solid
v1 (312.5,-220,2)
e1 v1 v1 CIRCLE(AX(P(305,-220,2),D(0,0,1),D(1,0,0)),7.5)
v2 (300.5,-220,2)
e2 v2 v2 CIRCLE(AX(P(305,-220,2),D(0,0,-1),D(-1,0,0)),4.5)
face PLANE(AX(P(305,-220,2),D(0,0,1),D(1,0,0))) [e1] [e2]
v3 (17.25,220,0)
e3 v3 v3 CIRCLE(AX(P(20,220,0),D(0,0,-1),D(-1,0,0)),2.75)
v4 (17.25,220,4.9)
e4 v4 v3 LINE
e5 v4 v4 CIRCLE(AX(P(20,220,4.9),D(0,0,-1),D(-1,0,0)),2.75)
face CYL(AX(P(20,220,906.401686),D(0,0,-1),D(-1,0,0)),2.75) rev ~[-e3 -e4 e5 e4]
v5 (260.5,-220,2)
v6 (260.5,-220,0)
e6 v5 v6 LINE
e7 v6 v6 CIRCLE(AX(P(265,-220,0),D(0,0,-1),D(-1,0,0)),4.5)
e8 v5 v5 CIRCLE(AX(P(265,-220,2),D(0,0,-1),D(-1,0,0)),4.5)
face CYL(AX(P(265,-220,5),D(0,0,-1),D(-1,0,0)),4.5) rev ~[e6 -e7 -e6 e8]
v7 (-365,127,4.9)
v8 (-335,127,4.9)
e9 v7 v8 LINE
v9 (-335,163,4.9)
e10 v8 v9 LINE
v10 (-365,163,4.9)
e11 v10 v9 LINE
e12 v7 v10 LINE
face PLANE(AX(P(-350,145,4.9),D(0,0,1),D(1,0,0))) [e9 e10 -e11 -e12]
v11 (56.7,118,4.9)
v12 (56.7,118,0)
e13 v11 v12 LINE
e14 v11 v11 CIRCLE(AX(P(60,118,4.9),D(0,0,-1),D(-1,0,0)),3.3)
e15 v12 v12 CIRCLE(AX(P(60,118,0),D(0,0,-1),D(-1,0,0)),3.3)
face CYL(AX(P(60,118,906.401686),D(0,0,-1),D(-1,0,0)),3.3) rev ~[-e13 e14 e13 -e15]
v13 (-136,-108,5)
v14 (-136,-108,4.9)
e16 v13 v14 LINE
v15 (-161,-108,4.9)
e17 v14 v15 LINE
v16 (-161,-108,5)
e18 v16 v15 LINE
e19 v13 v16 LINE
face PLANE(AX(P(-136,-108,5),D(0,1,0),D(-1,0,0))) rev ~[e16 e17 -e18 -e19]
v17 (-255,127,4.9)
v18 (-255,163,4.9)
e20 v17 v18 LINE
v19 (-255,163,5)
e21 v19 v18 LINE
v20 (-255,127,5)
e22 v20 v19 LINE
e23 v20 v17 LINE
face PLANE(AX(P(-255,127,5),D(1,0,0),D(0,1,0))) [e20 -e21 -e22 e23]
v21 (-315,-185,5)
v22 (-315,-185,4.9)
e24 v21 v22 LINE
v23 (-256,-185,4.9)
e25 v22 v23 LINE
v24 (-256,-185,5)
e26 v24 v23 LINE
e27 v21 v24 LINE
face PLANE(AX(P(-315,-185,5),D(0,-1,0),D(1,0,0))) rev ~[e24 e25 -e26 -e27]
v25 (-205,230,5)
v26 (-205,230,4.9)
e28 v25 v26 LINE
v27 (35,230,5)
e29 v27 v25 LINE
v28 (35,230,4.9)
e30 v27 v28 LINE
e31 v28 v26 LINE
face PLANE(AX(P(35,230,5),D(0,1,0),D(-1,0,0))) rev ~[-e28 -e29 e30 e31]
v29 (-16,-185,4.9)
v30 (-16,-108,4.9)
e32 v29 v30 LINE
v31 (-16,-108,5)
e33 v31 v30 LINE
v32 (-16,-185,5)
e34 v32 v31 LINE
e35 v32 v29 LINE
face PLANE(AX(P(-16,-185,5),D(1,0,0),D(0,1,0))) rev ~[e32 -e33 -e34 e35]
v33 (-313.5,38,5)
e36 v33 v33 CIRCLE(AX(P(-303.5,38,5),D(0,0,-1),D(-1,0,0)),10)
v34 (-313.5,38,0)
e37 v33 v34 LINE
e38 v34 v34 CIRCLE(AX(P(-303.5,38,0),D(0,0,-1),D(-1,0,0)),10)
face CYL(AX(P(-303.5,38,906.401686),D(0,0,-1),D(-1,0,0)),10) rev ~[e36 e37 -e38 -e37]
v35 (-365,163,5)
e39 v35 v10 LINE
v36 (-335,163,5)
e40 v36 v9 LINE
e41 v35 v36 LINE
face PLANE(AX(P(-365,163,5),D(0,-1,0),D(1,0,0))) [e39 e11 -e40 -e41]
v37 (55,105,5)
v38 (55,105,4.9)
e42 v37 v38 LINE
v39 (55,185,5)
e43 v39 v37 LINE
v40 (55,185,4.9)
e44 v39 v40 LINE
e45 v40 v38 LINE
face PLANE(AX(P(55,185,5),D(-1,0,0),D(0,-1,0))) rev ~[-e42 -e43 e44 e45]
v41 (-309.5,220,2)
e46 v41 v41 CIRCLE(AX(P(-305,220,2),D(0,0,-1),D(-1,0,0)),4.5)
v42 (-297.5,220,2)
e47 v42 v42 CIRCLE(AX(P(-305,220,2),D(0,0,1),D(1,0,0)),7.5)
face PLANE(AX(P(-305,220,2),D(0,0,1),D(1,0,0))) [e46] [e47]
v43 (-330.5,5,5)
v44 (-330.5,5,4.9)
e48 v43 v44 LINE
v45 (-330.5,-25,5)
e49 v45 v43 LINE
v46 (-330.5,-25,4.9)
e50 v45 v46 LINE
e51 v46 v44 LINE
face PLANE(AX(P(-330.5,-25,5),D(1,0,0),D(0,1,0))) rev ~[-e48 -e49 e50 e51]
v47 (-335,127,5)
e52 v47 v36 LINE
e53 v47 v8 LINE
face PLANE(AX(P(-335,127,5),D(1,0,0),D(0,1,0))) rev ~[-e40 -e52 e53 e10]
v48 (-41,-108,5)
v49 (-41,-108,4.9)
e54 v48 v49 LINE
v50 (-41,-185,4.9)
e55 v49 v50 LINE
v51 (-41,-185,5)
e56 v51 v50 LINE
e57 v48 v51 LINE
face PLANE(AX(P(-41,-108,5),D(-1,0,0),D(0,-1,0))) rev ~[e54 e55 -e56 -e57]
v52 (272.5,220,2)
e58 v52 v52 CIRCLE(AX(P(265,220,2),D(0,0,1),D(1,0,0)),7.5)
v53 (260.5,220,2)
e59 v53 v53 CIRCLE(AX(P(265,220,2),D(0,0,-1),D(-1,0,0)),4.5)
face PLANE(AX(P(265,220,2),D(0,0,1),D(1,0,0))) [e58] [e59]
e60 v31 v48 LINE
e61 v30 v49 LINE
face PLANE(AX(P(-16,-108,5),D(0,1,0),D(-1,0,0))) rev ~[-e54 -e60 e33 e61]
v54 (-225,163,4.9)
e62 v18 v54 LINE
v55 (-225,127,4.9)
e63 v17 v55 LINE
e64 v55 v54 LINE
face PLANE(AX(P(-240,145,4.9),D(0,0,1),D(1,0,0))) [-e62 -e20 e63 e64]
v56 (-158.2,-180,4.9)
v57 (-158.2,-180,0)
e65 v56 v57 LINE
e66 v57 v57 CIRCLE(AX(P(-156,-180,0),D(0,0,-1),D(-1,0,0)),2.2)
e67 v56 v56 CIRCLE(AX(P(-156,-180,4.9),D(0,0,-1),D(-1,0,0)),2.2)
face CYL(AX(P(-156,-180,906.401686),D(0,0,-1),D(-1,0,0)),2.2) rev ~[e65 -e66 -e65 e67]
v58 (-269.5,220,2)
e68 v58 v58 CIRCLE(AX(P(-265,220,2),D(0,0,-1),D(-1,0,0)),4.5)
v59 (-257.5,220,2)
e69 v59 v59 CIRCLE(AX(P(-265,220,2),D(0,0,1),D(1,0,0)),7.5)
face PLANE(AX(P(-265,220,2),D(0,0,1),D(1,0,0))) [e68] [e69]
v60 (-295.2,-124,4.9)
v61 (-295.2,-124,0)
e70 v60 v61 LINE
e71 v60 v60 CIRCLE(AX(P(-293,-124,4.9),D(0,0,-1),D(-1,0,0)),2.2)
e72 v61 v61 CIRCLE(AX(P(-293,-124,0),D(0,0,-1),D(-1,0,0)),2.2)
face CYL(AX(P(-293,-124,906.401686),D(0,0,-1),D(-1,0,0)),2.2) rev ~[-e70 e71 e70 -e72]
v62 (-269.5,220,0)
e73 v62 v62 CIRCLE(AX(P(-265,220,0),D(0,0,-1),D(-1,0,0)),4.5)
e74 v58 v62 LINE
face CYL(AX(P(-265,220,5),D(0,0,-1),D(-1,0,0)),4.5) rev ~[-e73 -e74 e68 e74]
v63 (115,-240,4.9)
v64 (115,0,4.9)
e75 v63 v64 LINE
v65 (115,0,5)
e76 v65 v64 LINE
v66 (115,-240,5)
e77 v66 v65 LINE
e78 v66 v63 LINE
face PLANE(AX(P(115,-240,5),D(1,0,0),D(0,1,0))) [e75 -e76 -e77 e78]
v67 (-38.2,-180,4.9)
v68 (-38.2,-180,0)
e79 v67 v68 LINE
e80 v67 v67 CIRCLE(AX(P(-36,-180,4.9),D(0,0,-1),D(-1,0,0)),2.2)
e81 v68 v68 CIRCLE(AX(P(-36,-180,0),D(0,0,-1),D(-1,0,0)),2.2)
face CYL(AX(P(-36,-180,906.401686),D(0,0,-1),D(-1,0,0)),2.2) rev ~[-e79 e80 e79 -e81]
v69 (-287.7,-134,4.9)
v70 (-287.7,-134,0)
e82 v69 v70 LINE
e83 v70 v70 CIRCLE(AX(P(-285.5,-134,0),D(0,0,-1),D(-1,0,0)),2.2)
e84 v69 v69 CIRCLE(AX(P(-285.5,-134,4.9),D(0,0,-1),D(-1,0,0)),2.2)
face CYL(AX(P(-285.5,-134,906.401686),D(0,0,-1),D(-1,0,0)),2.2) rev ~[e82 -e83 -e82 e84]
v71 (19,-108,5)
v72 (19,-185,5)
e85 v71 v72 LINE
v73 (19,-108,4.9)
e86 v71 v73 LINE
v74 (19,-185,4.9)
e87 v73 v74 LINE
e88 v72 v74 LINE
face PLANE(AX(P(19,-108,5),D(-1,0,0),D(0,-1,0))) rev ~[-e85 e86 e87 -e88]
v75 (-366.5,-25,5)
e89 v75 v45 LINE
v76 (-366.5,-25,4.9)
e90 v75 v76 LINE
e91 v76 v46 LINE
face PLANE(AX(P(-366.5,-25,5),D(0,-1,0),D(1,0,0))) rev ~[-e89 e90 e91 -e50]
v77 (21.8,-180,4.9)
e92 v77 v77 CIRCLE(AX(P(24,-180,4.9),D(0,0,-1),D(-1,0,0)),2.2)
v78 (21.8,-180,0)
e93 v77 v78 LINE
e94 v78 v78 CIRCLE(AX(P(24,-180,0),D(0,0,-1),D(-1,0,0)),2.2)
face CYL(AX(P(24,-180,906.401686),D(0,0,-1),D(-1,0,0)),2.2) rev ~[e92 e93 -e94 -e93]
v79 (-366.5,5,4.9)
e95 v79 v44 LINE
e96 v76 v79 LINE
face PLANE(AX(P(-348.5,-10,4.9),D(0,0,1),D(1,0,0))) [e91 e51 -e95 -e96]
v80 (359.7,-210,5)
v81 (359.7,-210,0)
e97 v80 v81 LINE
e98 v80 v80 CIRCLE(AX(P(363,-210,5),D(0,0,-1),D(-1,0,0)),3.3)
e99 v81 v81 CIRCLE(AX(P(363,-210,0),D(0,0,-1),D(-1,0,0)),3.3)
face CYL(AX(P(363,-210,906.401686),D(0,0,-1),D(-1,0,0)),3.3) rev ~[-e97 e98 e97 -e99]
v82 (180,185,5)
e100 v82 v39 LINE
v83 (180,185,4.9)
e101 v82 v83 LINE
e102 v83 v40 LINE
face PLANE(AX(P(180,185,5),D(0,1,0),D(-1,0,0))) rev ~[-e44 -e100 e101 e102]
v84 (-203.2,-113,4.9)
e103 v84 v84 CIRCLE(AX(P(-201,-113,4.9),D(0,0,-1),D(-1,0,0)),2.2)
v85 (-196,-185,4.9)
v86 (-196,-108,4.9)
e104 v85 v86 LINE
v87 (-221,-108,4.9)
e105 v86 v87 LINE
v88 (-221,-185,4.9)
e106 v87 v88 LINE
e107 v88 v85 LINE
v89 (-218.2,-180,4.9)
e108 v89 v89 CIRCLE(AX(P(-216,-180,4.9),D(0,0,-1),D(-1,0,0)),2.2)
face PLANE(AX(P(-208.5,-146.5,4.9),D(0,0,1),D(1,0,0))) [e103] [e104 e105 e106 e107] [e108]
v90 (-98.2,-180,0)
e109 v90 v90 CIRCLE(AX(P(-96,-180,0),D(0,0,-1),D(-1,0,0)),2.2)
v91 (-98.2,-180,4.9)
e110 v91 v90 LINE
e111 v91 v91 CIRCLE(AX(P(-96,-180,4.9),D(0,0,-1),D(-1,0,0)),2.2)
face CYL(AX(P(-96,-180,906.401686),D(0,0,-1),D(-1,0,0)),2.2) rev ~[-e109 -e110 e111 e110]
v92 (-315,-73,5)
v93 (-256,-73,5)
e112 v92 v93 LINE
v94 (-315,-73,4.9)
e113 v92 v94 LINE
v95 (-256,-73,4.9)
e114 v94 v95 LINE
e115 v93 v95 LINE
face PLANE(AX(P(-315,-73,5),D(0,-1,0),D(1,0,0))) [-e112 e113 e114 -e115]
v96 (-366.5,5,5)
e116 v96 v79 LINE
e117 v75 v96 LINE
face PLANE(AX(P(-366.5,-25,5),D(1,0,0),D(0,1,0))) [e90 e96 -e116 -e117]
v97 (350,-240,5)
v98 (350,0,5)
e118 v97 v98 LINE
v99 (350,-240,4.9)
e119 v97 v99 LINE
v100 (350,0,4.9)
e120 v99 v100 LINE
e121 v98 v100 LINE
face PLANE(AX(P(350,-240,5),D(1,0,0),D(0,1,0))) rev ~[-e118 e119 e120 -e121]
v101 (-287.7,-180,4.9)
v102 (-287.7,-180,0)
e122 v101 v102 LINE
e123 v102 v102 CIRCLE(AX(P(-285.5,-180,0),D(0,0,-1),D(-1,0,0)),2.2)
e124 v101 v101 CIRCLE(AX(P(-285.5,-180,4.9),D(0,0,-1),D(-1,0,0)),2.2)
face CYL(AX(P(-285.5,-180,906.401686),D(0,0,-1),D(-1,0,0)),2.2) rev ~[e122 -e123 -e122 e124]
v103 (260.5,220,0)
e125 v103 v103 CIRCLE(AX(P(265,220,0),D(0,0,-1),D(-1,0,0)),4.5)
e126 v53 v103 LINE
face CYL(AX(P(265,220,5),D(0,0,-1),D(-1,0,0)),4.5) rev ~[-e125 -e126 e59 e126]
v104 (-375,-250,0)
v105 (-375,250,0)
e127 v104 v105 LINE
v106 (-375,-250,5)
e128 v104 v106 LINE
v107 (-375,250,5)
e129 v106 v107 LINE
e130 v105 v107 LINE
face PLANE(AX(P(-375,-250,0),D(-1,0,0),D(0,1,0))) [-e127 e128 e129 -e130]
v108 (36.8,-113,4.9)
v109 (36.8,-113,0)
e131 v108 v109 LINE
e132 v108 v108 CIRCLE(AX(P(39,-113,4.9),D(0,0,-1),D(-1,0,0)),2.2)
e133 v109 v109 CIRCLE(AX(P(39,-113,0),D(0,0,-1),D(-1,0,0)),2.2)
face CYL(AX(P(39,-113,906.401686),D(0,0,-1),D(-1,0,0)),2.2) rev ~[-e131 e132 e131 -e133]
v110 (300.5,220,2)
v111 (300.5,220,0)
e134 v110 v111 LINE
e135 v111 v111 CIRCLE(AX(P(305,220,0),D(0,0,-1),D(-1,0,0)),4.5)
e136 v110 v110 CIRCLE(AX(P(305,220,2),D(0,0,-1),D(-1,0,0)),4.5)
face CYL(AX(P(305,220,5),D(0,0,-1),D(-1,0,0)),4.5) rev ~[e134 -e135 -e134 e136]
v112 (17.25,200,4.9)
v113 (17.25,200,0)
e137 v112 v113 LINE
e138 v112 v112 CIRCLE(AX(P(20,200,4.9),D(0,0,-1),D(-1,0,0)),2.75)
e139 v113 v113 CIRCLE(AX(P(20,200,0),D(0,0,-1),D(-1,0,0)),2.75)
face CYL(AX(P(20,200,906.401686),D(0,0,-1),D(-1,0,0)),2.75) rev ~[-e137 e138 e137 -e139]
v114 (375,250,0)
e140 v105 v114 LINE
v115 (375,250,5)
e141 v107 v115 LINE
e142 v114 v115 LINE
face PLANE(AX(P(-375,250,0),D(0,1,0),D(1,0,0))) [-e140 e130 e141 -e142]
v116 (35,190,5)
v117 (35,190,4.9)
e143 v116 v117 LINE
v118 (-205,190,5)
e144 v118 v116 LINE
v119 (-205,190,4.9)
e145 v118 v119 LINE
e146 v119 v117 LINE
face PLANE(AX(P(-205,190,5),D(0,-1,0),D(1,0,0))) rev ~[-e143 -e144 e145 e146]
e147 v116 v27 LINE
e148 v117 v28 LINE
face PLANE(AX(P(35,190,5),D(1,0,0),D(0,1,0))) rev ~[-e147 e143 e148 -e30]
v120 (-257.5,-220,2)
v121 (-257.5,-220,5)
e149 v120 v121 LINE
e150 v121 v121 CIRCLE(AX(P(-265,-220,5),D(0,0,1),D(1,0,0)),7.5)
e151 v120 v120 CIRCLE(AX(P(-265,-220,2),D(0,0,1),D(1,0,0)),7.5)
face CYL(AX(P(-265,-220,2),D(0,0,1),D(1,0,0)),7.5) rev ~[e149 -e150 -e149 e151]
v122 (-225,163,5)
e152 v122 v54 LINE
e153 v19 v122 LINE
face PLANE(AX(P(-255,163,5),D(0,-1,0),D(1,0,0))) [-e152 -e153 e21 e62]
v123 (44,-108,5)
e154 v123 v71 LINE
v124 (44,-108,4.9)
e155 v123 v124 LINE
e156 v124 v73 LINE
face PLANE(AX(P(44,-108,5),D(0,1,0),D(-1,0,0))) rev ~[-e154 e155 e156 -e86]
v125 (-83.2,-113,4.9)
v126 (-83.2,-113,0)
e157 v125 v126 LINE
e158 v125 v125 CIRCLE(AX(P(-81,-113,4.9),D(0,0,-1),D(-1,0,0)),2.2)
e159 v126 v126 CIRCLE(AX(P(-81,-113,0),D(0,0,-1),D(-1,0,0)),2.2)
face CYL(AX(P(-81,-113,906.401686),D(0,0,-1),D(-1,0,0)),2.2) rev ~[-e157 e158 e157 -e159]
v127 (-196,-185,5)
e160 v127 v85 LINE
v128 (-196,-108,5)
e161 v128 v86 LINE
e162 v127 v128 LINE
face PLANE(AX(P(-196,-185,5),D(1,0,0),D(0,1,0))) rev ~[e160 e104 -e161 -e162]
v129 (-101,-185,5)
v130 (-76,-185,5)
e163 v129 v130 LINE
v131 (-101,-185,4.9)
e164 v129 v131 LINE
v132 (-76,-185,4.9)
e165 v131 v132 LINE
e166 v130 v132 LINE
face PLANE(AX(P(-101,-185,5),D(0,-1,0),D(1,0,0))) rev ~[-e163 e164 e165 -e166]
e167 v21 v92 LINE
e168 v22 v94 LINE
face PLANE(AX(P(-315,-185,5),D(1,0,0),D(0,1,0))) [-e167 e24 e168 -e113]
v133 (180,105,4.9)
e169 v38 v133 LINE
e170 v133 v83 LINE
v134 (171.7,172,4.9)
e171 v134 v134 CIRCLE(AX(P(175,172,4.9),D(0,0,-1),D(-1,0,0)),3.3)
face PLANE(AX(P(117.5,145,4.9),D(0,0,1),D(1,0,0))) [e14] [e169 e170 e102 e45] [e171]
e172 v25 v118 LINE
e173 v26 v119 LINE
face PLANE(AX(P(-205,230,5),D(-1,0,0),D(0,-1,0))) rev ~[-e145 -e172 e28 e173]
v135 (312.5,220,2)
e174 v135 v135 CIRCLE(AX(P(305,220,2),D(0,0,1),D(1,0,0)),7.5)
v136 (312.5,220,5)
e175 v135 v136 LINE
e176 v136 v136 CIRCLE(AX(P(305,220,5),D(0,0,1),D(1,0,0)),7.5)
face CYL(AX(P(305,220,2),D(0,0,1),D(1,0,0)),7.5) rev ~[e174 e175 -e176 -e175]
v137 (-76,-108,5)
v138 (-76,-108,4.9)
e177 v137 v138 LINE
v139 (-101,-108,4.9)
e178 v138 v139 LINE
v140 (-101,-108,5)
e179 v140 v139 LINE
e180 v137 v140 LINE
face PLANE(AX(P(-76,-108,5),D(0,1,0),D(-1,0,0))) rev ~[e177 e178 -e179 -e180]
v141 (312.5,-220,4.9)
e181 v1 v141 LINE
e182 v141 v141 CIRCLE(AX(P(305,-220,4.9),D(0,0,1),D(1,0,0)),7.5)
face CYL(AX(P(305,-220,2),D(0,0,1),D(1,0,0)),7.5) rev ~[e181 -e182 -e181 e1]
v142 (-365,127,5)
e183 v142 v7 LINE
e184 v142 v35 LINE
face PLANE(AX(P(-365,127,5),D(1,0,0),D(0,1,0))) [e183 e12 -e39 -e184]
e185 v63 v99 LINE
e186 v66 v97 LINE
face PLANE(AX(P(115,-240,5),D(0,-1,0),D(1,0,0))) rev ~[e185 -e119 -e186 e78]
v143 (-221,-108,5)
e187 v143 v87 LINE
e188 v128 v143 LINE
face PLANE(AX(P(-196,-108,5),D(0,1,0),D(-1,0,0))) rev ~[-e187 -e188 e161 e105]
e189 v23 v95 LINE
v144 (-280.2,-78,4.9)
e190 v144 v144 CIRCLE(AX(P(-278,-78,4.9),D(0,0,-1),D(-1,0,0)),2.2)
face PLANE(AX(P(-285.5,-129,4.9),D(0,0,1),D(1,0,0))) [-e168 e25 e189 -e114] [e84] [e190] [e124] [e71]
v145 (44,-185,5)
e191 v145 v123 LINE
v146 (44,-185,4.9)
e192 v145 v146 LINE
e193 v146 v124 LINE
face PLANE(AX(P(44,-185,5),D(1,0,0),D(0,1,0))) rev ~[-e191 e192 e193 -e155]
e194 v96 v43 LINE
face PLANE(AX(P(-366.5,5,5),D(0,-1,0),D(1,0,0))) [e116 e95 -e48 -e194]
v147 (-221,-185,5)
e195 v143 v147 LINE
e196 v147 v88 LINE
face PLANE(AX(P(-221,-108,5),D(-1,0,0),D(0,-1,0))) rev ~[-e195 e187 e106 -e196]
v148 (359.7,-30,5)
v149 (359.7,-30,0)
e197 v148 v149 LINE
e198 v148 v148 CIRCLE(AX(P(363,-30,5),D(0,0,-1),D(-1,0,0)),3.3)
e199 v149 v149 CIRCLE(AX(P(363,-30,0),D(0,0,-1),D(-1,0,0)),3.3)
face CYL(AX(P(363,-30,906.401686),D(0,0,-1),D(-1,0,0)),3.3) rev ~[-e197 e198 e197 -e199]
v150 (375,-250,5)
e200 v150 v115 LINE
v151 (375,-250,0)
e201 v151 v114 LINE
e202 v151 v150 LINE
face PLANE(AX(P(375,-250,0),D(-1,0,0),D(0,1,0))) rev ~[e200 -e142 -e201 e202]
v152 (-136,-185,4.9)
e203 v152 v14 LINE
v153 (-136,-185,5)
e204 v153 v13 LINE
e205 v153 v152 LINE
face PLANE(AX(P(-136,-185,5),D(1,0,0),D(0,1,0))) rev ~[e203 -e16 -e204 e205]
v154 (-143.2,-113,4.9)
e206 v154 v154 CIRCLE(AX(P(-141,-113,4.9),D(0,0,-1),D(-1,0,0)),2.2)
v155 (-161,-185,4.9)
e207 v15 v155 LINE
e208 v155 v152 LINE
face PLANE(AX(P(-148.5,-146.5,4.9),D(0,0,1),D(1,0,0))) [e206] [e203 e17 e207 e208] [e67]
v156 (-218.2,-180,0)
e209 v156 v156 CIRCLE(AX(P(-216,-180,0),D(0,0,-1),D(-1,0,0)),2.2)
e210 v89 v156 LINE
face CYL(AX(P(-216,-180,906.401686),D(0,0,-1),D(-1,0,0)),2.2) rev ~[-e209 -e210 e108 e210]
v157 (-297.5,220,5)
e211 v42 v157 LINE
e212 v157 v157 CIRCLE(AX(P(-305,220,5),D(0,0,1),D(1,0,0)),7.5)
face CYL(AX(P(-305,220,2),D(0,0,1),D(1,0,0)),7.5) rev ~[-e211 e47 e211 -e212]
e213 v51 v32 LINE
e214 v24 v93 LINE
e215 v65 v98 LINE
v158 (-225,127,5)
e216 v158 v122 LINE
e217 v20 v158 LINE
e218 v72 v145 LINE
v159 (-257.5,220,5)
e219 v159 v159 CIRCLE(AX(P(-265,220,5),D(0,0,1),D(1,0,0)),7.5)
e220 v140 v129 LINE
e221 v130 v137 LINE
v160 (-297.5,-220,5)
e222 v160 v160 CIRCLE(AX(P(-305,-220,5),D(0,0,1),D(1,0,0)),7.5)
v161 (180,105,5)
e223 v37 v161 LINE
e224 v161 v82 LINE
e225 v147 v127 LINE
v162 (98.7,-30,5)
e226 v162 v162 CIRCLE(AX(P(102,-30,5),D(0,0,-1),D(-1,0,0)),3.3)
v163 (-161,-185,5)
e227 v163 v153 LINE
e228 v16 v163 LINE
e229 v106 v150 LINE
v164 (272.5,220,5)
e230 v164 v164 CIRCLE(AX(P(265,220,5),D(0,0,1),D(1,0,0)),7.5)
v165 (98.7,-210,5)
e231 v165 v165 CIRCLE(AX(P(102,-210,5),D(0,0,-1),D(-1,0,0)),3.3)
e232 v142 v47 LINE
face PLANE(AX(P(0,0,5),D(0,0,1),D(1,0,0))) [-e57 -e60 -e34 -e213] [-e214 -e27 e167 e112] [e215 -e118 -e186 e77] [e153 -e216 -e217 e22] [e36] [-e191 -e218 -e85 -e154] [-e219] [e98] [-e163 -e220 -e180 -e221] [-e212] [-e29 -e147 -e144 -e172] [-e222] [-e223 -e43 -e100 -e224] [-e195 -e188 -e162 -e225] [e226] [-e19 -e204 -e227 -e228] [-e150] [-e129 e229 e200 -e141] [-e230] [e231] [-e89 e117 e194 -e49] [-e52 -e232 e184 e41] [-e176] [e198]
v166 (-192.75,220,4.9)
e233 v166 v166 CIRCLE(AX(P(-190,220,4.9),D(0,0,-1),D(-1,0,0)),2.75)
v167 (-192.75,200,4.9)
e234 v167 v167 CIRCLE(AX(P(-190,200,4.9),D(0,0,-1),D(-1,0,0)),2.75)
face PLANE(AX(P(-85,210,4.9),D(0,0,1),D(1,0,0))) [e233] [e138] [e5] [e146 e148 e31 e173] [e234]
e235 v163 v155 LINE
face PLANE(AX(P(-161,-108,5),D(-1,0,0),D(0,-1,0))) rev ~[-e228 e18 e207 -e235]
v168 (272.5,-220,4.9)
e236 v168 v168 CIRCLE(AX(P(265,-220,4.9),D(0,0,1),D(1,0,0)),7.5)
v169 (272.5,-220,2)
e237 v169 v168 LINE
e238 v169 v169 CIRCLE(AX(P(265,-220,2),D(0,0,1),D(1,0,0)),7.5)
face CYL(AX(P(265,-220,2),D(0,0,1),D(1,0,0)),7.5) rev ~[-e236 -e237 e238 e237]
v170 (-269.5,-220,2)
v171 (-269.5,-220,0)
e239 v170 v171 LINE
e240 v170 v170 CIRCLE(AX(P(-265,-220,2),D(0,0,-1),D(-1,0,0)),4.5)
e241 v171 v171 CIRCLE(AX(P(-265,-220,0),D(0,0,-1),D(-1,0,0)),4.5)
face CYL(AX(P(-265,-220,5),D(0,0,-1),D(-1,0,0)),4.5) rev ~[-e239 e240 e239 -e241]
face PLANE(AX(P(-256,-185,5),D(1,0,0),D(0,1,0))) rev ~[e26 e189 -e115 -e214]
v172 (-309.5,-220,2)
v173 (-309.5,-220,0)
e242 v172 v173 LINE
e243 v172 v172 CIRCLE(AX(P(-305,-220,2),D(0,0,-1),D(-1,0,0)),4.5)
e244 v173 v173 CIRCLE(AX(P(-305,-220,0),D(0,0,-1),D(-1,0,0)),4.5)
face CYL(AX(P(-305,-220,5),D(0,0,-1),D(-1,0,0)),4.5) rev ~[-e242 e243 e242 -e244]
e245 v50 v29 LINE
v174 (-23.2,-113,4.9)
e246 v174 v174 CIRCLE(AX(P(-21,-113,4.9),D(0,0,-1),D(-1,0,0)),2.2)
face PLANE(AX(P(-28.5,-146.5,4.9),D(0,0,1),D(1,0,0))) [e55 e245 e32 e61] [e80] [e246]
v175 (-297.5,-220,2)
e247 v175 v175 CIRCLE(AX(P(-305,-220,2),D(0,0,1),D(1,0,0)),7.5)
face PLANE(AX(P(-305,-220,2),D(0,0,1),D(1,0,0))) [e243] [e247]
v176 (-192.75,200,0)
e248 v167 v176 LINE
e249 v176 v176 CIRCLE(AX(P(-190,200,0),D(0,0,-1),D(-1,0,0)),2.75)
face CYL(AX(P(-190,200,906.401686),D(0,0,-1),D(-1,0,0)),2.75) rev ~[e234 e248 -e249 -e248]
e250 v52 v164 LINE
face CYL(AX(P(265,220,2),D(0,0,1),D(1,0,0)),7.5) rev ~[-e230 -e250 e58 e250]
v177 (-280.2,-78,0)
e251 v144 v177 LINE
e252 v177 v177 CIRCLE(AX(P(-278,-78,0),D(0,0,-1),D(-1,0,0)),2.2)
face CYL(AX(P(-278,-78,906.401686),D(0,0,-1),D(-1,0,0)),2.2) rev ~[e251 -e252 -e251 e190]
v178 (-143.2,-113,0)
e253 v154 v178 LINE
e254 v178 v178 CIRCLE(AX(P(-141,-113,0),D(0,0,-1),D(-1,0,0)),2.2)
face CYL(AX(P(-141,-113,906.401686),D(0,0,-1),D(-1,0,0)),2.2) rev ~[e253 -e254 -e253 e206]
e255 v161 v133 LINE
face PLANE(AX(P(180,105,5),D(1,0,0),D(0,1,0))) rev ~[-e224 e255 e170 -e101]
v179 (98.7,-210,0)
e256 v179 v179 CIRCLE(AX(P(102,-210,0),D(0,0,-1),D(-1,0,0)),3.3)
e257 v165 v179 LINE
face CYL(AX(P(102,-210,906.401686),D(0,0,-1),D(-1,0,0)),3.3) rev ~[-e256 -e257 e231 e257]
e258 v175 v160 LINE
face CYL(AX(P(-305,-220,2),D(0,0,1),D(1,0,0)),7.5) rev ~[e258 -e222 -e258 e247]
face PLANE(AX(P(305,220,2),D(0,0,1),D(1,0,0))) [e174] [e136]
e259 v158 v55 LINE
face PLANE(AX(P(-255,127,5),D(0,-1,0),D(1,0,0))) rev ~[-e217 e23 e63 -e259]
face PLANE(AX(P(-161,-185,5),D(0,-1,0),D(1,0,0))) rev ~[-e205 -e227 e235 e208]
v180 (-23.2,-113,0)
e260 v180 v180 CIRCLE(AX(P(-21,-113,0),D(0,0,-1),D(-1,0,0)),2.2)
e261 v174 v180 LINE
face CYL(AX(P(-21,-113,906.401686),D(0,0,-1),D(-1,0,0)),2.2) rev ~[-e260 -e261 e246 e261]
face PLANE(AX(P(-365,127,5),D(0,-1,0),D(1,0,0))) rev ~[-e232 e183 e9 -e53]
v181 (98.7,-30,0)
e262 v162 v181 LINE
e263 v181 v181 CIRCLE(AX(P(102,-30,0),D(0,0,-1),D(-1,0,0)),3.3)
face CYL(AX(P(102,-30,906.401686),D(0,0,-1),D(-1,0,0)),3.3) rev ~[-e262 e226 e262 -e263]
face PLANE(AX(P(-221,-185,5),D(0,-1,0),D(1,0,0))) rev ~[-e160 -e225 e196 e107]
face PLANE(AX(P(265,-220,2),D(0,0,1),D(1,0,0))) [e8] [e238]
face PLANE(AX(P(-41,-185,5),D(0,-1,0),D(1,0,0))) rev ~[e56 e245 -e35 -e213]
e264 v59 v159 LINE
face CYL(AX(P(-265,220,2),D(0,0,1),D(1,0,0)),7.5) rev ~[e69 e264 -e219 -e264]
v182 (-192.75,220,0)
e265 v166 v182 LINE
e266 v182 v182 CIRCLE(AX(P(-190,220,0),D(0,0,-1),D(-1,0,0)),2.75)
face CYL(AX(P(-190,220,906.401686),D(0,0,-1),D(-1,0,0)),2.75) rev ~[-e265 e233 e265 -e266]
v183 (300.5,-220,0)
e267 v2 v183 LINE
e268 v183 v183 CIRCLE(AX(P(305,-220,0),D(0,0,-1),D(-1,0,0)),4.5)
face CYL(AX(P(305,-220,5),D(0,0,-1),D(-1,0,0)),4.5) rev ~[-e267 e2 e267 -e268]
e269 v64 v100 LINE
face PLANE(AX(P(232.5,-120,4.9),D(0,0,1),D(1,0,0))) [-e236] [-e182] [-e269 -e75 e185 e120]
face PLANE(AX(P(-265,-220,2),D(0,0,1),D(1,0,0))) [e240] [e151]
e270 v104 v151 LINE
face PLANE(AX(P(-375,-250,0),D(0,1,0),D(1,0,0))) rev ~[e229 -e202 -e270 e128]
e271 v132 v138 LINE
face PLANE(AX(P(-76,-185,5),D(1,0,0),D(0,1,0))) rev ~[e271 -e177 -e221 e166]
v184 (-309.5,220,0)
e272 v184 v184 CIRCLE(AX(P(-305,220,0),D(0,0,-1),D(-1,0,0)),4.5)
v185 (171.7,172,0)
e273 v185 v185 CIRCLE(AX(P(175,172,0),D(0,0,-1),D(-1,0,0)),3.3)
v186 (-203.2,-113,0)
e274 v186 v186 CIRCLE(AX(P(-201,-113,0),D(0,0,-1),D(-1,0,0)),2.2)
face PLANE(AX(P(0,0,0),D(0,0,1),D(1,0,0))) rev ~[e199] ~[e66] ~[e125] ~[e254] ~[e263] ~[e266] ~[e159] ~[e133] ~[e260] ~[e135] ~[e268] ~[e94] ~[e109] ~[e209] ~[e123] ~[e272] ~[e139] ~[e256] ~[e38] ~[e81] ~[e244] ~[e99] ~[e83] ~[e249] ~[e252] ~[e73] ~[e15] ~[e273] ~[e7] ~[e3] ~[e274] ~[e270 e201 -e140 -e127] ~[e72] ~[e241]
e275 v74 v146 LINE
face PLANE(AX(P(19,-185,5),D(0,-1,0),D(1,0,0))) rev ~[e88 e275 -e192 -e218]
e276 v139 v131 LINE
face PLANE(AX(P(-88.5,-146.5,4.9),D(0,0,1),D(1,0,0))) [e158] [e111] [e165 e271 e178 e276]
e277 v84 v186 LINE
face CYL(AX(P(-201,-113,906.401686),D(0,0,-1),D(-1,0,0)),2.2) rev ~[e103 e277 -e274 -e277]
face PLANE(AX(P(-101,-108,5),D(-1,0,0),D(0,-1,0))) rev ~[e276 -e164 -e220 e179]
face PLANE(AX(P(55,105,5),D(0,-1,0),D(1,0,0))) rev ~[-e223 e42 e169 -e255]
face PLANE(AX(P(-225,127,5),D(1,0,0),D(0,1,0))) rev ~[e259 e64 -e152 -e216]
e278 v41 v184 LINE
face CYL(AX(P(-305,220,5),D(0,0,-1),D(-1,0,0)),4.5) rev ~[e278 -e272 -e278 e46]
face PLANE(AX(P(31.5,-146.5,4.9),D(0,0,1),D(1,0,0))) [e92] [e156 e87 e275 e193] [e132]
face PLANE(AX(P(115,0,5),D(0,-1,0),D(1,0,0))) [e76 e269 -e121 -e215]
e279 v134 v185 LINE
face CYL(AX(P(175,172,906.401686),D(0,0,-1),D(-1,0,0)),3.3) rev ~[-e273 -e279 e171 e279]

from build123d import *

# Parameters (mm, degrees)
F0_W           = 750
F0_H           = 500
F1_DEPTH       = 5
F4_D           = 9
F4_CBORE_D     = 15
F4_CBORE_DEPTH = 3
F3_W           = 235
F3_H           = 240
F5_DEPTH       = 0.1
F6_DEPTH       = 0.1
F3_W_2         = 59
F3_H_2         = 112
F7_DEPTH       = 0.1
F8_DEPTH       = 0.1
F9_DEPTH       = 0.1
F11_D          = 4.4
F12_D          = 5.5
F13_D          = 6.6
F15_D          = 20
F16_W          = 36
F16_H          = 30
F16_W_2        = 30
F16_H_2        = 36
F17_DEPTH      = 0.1


# Not quite as in the source:
# - a feature names something its author has since deleted; it is built from what else it names


with BuildPart() as f1:
    # F0 (on Top) → F1 (new body)
    with BuildSketch(Plane.XY):
        Rectangle(F0_W, F0_H)
    extrude(amount=F1_DEPTH)

    # F4 (through all)
    with Locations(Plane.XY.offset(5)):
        with Locations((-305, 220), (-265, 220), (-305, -220), (-265, -220), (265, -220), (305, -220), (265, 220), (305, 220)):
            CounterBoreHole(F4_D / 2, F4_CBORE_D / 2, F4_CBORE_DEPTH)

    # F3 (on face) → F5 (cut)
    with BuildSketch(Plane.XY.offset(5)):
        with Locations((232.5, -120)):
            Rectangle(F3_W, F3_H)
    extrude(amount=-F5_DEPTH, mode=Mode.SUBTRACT)

    # F3 (on face) → F6 (cut)
    with BuildSketch(Plane.XY.offset(5)):
        Polygon((180, 122.1947473288), (180, 165), (180, 185), (55, 185), (55, 145), (55, 105), (180, 105), align=None)
    extrude(amount=-F6_DEPTH, mode=Mode.SUBTRACT)

    # F3 (on face) → F7 (cut)
    with BuildSketch(Plane.XY.offset(5)):
        with Locations((-285.5, -129)):
            Rectangle(F3_W_2, F3_H_2)
    extrude(amount=-F7_DEPTH, mode=Mode.SUBTRACT)

    # F3 (on face) → F8 (cut)
    with BuildSketch(Plane.XY.offset(5)):
        Polygon((35, 230), (-205, 230), (-205, 190), (35, 190), (35, 210), align=None)
    extrude(amount=-F8_DEPTH, mode=Mode.SUBTRACT)

    # F3 (on face) → F9 (cut)
    with BuildSketch(Plane.XY.offset(5)):
        Polygon((-208.5, -108), (-221, -108), (-221, -185), (-196, -185), (-196, -108), align=None)
        Polygon((-136, -185), (-136, -108), (-148.5, -108), (-161, -108), (-161, -185), align=None)
        Polygon((-76, -185), (-76, -108), (-88.5, -108), (-101, -108), (-101, -185), align=None)
        Polygon((-16, -185), (-16, -108), (-28.5, -108), (-41, -108), (-41, -185), align=None)
        Polygon((31.5, -108), (19, -108), (19, -185), (44, -185), (44, -108), align=None)
    extrude(amount=-F9_DEPTH, mode=Mode.SUBTRACT)

    # F11 (through all)
    with Locations(Plane.XY.offset(5)):
        with Locations((-285.5, -134), (-293, -124), (-278, -78), (-285.5, -180), (-216, -180), (-201, -113), (-141, -113), (-156, -180), (-96, -180), (-81, -113), (-21, -113), (-36, -180), (24, -180), (39, -113)):
            Hole(F11_D / 2)

    # F12 (through all)
    with Locations(Plane.XY.offset(5)):
        with Locations((-190, 220), (-190, 200), (20, 200), (20, 220)):
            Hole(F12_D / 2)

    # F13 (through all)
    with Locations(Plane.XY.offset(5)):
        with Locations((60, 118), (175, 172), (102, -30), (102, -210), (363, -210), (363, -30)):
            Hole(F13_D / 2)

    # F15 (through all)
    with Locations(Plane.XY.offset(5)):
        with Locations((-303.5, 38)):
            Hole(F15_D / 2)

    # F16 (on face) → F17 (cut)
    with BuildSketch(Plane.XY.offset(5)):
        with Locations((-348.5, -10)):
            Rectangle(F16_W, F16_H)
        with Locations((-350, 145)):
            Rectangle(F16_W_2, F16_H_2)
        with Locations((-240, 145)):
            Rectangle(F16_W_2, F16_H_2)
    extrude(amount=-F17_DEPTH, mode=Mode.SUBTRACT)


solid = f1.part
